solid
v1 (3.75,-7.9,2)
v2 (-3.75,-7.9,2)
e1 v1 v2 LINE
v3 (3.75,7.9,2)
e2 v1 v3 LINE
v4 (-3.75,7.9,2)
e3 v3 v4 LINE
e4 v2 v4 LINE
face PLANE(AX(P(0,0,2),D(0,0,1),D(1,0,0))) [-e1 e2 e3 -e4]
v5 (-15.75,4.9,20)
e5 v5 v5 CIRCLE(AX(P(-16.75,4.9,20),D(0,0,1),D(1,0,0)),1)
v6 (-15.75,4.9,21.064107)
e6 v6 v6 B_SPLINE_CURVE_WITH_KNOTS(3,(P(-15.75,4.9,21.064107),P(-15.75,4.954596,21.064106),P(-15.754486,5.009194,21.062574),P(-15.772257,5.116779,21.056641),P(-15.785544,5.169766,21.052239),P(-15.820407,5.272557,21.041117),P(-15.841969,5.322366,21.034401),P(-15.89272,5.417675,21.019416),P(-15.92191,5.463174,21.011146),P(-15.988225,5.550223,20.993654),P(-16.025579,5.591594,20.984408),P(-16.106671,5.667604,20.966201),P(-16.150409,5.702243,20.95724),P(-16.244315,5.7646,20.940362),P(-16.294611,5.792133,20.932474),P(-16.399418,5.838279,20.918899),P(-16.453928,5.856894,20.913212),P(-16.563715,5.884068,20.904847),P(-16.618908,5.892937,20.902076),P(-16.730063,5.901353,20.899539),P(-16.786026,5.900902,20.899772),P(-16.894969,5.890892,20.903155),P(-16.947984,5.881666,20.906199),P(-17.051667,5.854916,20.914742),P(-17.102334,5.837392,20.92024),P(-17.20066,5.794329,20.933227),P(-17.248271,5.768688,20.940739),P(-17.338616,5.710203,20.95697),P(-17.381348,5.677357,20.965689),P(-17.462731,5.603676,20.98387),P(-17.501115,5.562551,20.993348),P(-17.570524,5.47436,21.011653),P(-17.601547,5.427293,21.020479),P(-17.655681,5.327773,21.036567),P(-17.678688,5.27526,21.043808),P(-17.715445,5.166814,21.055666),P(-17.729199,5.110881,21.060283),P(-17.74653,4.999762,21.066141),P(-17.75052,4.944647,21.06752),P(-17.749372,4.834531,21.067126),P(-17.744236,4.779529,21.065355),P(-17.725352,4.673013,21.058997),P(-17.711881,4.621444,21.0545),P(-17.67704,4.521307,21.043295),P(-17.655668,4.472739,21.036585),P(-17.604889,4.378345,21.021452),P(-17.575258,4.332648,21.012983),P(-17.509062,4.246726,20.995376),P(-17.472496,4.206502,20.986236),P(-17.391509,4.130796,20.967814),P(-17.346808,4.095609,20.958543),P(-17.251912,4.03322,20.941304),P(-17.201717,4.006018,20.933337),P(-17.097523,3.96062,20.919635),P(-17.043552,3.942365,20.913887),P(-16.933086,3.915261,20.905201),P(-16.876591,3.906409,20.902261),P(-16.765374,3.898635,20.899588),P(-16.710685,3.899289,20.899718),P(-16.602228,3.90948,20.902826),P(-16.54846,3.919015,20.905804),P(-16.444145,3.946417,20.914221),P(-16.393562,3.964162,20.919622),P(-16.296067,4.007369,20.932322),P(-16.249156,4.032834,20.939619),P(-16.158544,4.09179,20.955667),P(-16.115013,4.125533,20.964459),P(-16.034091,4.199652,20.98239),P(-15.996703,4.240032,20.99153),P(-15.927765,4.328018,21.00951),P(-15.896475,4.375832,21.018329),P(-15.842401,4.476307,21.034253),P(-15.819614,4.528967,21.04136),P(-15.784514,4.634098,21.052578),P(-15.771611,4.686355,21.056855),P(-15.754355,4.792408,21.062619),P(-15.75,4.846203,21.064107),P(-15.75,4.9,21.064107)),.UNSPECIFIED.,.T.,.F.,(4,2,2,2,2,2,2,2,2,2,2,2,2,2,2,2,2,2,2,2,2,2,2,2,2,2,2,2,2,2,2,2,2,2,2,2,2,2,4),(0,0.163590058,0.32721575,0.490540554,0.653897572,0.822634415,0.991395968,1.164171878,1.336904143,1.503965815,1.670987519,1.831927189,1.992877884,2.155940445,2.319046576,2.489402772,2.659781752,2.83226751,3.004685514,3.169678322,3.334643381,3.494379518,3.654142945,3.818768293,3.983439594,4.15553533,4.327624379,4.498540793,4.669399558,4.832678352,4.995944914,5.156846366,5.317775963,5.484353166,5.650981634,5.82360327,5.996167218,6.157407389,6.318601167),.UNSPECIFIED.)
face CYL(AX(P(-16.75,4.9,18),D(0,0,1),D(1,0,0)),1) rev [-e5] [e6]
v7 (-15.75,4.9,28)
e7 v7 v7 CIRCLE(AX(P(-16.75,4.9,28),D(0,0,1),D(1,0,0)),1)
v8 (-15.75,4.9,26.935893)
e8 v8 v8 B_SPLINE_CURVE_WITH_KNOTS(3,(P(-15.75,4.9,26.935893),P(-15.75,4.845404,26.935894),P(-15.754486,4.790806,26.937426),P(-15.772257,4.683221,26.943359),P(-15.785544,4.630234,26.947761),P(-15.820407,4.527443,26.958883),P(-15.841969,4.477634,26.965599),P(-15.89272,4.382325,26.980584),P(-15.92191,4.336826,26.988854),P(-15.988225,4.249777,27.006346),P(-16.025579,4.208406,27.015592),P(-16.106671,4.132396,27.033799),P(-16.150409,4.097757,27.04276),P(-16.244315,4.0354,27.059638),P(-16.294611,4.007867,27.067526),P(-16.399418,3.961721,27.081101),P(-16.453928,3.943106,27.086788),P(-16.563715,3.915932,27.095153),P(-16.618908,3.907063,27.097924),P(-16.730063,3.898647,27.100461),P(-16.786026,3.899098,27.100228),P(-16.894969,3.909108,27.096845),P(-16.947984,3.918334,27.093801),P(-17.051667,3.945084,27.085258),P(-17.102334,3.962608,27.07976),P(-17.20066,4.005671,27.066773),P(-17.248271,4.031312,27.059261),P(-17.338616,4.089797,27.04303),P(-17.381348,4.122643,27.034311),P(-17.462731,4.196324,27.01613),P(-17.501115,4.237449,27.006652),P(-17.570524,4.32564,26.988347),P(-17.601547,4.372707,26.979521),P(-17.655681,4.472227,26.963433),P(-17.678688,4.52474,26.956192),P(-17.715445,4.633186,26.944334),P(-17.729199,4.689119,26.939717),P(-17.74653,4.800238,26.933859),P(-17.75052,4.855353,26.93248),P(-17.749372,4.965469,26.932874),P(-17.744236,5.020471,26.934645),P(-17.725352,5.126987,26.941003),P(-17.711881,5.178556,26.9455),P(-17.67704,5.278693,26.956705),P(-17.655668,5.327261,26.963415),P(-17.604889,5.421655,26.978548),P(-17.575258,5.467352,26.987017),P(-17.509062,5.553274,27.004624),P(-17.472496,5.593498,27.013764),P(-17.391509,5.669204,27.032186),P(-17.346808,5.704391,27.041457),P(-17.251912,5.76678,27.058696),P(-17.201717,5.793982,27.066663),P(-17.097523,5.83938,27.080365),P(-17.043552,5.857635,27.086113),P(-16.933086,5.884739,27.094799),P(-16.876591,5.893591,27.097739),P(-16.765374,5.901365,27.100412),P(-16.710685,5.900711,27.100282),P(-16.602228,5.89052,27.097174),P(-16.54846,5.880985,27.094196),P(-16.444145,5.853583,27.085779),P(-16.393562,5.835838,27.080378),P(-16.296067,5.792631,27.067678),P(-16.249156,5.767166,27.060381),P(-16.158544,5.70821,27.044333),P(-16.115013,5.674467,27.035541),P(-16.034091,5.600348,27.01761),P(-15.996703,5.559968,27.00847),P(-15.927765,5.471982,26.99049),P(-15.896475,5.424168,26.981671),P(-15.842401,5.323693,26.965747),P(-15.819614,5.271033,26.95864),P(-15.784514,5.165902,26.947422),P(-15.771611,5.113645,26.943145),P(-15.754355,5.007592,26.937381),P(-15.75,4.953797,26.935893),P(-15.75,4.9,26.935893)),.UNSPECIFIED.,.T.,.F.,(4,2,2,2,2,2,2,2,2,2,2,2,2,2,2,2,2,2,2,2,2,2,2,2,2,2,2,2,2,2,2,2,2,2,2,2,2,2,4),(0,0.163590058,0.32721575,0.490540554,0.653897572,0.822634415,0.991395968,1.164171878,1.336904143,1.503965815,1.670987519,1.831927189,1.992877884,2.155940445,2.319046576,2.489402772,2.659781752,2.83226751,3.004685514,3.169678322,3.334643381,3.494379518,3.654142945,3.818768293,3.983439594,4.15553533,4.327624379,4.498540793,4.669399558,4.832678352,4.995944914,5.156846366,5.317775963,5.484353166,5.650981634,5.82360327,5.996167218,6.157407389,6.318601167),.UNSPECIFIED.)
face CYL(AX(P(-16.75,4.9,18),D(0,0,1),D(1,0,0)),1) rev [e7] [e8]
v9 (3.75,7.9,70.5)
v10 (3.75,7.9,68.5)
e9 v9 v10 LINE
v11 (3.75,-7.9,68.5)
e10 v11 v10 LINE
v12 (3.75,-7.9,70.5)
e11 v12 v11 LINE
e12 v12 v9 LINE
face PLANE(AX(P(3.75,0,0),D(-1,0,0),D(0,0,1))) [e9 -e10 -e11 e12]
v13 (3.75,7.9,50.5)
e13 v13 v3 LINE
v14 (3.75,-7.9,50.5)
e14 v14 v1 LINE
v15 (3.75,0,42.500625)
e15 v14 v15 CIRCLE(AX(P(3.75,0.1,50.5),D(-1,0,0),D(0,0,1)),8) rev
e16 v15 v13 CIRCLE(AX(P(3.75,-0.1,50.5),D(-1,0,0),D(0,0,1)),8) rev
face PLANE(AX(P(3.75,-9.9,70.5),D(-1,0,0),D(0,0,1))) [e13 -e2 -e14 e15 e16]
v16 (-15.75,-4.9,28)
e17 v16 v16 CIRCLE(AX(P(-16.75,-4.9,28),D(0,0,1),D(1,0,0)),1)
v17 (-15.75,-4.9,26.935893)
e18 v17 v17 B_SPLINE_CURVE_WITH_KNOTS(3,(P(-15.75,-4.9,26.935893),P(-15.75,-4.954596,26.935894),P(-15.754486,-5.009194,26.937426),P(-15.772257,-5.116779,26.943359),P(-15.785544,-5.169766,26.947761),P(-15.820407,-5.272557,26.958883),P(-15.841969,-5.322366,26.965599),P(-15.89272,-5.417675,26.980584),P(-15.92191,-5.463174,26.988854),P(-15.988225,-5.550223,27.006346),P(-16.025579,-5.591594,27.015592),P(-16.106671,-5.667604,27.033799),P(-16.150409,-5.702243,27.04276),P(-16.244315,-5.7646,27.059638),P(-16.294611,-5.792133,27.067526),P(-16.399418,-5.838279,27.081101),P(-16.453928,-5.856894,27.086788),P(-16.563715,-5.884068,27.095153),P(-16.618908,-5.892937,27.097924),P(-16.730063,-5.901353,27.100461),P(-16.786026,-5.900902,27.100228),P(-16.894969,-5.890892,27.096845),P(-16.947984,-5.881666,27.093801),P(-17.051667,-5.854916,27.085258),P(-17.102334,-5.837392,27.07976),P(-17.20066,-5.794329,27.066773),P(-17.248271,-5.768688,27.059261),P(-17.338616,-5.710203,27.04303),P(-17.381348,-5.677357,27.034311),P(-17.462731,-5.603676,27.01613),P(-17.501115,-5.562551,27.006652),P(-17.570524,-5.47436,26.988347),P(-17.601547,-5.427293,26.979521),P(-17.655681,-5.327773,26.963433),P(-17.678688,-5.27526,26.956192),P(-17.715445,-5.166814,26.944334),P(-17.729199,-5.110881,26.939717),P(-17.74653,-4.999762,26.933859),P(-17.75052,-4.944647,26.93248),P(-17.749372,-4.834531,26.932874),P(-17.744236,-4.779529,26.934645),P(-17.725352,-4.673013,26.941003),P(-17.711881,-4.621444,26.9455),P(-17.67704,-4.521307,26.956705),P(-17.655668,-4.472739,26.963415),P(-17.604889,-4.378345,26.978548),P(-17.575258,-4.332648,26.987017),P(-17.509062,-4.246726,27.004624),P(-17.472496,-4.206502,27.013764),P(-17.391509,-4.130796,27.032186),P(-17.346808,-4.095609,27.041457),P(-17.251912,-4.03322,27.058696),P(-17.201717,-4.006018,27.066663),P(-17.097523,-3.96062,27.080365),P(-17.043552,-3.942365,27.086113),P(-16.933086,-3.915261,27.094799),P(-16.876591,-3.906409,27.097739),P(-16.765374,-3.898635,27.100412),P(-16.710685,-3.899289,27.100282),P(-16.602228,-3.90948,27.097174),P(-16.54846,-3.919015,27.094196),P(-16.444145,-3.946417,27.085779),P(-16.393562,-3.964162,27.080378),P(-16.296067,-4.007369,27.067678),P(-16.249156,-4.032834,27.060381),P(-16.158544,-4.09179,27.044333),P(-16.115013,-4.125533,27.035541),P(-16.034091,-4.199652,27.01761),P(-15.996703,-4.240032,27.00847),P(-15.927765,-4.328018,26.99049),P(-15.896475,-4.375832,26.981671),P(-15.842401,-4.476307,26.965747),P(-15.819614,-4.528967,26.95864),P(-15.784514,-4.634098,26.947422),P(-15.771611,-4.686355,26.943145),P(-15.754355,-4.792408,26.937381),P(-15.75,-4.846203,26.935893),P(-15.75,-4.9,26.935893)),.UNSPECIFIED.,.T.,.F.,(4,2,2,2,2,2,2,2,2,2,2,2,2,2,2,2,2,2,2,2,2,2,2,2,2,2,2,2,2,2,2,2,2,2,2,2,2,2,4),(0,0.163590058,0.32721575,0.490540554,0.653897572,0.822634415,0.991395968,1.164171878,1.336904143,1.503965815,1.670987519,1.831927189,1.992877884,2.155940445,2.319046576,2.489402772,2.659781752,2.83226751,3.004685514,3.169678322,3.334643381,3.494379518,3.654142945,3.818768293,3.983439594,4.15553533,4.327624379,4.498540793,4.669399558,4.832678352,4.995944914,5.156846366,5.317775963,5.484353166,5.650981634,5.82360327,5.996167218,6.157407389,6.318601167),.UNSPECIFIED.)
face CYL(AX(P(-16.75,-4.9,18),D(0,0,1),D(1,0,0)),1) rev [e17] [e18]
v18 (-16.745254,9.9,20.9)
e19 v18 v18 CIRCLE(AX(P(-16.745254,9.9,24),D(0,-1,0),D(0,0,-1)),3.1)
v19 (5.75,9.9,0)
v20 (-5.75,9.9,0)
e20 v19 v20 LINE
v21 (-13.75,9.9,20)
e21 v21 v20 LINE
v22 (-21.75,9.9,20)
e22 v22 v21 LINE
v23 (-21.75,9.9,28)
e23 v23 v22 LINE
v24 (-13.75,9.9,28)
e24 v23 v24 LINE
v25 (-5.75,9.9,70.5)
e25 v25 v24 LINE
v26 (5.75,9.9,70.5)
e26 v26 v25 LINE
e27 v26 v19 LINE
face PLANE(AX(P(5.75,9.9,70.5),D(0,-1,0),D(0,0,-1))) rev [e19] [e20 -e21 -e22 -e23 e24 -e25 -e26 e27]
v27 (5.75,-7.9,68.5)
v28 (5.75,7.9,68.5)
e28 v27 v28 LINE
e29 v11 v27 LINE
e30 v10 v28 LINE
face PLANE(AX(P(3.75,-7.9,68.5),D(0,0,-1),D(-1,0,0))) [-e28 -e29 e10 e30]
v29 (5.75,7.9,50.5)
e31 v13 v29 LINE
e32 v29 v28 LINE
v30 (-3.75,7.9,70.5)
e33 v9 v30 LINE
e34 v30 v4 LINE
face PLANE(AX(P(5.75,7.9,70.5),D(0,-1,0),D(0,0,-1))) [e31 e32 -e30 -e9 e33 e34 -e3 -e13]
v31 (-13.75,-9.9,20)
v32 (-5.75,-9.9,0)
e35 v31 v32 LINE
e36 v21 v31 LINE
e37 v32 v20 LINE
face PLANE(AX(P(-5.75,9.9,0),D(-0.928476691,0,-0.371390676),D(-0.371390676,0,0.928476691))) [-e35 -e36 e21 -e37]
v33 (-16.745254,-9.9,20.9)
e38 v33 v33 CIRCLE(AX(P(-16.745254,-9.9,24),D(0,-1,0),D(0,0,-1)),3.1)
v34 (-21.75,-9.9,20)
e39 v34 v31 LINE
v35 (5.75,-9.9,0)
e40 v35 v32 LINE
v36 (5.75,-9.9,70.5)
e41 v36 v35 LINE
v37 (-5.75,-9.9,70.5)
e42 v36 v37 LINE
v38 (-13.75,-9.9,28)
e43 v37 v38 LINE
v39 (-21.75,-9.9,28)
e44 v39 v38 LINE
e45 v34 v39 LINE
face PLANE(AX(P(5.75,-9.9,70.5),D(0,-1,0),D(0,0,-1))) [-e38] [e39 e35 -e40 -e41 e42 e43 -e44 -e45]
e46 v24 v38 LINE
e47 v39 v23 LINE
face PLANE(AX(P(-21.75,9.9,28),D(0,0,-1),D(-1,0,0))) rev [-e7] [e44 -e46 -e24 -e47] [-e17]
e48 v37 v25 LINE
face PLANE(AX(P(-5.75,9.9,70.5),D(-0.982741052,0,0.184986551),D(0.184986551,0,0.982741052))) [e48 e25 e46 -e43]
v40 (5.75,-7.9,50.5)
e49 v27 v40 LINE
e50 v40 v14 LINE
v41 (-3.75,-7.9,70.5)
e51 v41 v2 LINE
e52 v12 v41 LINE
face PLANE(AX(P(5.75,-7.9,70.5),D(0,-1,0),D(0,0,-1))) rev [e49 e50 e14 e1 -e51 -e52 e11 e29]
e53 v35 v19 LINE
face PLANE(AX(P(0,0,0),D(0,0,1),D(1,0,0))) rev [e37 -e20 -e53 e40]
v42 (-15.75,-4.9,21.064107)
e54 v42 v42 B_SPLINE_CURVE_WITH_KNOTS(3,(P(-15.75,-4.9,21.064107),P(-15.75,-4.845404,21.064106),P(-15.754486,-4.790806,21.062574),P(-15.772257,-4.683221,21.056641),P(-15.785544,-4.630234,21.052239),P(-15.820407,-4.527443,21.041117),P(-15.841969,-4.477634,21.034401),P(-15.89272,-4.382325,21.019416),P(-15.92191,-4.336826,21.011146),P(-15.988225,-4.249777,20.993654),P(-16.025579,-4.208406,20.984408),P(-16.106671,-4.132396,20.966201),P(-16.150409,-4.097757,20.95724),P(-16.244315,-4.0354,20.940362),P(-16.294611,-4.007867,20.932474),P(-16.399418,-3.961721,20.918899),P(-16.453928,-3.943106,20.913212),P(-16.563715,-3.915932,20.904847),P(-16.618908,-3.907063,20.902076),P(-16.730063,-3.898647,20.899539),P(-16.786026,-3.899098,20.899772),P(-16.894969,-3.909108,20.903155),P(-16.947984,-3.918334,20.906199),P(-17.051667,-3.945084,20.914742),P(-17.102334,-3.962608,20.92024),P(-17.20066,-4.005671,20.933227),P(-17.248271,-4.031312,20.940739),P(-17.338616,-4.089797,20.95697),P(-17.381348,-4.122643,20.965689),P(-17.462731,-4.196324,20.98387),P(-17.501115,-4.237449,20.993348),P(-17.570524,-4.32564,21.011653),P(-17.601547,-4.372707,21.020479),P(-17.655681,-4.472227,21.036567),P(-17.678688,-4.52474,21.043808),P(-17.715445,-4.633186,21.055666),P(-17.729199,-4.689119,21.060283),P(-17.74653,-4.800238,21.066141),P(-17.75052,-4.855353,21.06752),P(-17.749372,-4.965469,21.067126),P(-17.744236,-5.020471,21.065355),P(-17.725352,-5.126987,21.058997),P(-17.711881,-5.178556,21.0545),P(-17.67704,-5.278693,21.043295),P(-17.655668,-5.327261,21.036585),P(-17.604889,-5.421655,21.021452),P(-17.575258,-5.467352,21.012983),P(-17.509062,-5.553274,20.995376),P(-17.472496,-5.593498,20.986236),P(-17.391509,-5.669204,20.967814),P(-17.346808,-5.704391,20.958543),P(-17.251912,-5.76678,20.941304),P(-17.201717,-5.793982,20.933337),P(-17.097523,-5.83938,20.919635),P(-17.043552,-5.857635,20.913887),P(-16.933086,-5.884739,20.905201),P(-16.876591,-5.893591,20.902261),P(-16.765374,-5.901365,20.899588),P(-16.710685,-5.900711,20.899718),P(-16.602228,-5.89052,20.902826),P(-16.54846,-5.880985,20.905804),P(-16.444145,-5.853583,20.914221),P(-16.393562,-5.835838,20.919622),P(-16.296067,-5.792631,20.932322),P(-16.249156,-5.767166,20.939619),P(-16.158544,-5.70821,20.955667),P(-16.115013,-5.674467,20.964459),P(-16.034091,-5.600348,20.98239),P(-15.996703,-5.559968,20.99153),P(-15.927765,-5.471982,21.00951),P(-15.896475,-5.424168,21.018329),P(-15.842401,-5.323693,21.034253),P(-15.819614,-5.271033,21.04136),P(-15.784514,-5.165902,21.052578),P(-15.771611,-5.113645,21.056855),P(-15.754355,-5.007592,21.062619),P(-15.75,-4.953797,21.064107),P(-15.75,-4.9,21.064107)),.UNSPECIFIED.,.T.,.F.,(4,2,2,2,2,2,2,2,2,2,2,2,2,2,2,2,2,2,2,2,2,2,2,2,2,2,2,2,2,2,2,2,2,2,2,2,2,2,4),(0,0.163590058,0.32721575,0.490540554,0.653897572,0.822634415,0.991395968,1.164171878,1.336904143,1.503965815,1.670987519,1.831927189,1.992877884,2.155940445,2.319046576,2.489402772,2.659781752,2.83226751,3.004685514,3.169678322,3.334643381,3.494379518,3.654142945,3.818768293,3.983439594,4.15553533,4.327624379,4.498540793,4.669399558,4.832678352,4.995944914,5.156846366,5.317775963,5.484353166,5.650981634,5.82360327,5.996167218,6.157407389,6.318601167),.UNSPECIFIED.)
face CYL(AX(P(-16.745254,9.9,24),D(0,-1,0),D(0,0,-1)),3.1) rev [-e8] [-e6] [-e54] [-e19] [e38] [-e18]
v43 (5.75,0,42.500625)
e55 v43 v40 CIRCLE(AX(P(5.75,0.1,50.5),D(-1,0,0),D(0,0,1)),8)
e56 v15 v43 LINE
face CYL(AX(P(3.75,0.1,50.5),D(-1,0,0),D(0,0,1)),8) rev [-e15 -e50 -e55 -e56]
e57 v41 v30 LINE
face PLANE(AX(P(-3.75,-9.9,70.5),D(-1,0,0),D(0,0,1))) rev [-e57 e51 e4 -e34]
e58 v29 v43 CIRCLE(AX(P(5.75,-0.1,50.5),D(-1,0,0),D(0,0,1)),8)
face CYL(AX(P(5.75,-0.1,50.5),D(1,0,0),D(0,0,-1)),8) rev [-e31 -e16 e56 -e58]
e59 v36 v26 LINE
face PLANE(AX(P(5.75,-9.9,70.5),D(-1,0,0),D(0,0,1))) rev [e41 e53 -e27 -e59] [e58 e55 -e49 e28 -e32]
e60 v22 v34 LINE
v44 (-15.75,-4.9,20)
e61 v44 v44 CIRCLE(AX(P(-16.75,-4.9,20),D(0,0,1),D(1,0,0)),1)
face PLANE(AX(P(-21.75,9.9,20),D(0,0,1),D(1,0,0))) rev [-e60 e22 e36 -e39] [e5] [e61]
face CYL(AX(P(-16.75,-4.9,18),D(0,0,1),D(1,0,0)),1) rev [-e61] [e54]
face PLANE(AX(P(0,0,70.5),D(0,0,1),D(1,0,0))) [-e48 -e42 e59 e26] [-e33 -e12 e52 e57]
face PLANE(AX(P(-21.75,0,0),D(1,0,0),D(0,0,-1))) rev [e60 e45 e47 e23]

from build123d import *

# Parameters (mm, degrees)
CROQUIS1_W              = 19.8
CROQUIS1_H              = 11.5
SALIENTE_EXTRUIR1_DEPTH = 70.5
VACIADO1_T              = -2
CROQUIS4_W              = 15.8
CROQUIS4_H              = 28
CORTAR_EXTRUIR1_DEPTH   = 2
REDONDEO1_R             = 8
CROQUIS5_W              = 15.8
CROQUIS5_H              = 2
SALIENTE_EXTRUIR2_DEPTH = 2
CROQUIS6_W              = 19.8
CROQUIS6_H              = 8
SALIENTE_EXTRUIR4_DEPTH = 16
CROQUIS8_R              = 1
CORTAR_EXTRUIR3_DEPTH   = 10
SALIENTE_EXTRUIR5_DEPTH = 19.8
CROQUIS10_R             = 3.1
CORTAR_EXTRUIR4_DEPTH   = 19.8


with BuildPart() as part:
    # Croquis1 → Saliente-Extruir1 (new body)
    with BuildSketch(Plane(origin=(0, 0, 0), x_dir=(0, 1, 0), z_dir=(0, 0, 1))):
        Rectangle(CROQUIS1_W, CROQUIS1_H)
    extrude(amount=SALIENTE_EXTRUIR1_DEPTH)

    # Vaciado1
    vaciado1_openings = [part.faces().sort_by_distance(p)[0] for p in [
        (0, 0, 70.5),
    ]]
    offset(amount=VACIADO1_T, openings=vaciado1_openings, kind=Kind.INTERSECTION)

    # Croquis4 → Cortar-Extruir1 (cut)
    with BuildSketch(Plane.YZ.offset(5.75)):
        with Locations((0, 56.5)):
            Rectangle(CROQUIS4_W, CROQUIS4_H)
    extrude(amount=-CORTAR_EXTRUIR1_DEPTH, mode=Mode.SUBTRACT)

    # Redondeo1
    # the kernel refuses this fillet: 8 mm, written as the material it adds along each edge
    with BuildSketch(Plane(origin=(5.75, 7.9, 42.5), x_dir=(0, -1, 0), z_dir=(-1, 0, 0)), Plane(origin=(5.75, -7.9, 42.5), x_dir=(0, 0, 1), z_dir=(-1, 0, 0))) as redondeo1_piece_1:
        with BuildLine():
            CenterArc((REDONDEO1_R, REDONDEO1_R), REDONDEO1_R, 180, 90)
            Line((0, REDONDEO1_R), (0, 0))
            Line((0, 0), (REDONDEO1_R, 0))
        make_face()
    extrude(amount=2)

    # Croquis5 → Saliente-Extruir2 (add)
    with BuildSketch(Plane.YZ.offset(5.75)):
        with Locations((0, 69.5)):
            Rectangle(CROQUIS5_W, CROQUIS5_H)
    extrude(amount=-SALIENTE_EXTRUIR2_DEPTH)

    # Croquis6 → Saliente-Extruir4 (add)
    with BuildSketch(Plane(origin=(-5.75, 0, 0), x_dir=(0, -1, 0), z_dir=(-1, 0, 0))):
        with Locations((0, 24)):
            Rectangle(CROQUIS6_W, CROQUIS6_H)
    extrude(amount=SALIENTE_EXTRUIR4_DEPTH)

    # Croquis8 → Cortar-Extruir3 (cut)
    with BuildSketch(Plane.XY.offset(28)):
        with Locations((-16.75, 4.9)):
            Circle(CROQUIS8_R)
        with Locations((-16.75, -4.9)):
            Circle(CROQUIS8_R)
    extrude(amount=-CORTAR_EXTRUIR3_DEPTH, mode=Mode.SUBTRACT)

    # Croquis9 → Saliente-Extruir5 (add)
    with BuildSketch(Plane.XZ.offset(9.9)):
        Polygon((-5.75, 70.5), (-13.75, 28), (-5.75, 28), align=None)
        Polygon((-5.75, 0), (-13.75, 20), (-5.75, 20), align=None)
    extrude(amount=-SALIENTE_EXTRUIR5_DEPTH)

    # Croquis10 → Cortar-Extruir4 (cut)
    with BuildSketch(Plane.XZ.offset(9.9)):
        with Locations(Location((-16.745253682, 24, 0), (0, 0, 270))):
            Circle(CROQUIS10_R)
    extrude(amount=-CORTAR_EXTRUIR4_DEPTH, mode=Mode.SUBTRACT)


solid = part.part
